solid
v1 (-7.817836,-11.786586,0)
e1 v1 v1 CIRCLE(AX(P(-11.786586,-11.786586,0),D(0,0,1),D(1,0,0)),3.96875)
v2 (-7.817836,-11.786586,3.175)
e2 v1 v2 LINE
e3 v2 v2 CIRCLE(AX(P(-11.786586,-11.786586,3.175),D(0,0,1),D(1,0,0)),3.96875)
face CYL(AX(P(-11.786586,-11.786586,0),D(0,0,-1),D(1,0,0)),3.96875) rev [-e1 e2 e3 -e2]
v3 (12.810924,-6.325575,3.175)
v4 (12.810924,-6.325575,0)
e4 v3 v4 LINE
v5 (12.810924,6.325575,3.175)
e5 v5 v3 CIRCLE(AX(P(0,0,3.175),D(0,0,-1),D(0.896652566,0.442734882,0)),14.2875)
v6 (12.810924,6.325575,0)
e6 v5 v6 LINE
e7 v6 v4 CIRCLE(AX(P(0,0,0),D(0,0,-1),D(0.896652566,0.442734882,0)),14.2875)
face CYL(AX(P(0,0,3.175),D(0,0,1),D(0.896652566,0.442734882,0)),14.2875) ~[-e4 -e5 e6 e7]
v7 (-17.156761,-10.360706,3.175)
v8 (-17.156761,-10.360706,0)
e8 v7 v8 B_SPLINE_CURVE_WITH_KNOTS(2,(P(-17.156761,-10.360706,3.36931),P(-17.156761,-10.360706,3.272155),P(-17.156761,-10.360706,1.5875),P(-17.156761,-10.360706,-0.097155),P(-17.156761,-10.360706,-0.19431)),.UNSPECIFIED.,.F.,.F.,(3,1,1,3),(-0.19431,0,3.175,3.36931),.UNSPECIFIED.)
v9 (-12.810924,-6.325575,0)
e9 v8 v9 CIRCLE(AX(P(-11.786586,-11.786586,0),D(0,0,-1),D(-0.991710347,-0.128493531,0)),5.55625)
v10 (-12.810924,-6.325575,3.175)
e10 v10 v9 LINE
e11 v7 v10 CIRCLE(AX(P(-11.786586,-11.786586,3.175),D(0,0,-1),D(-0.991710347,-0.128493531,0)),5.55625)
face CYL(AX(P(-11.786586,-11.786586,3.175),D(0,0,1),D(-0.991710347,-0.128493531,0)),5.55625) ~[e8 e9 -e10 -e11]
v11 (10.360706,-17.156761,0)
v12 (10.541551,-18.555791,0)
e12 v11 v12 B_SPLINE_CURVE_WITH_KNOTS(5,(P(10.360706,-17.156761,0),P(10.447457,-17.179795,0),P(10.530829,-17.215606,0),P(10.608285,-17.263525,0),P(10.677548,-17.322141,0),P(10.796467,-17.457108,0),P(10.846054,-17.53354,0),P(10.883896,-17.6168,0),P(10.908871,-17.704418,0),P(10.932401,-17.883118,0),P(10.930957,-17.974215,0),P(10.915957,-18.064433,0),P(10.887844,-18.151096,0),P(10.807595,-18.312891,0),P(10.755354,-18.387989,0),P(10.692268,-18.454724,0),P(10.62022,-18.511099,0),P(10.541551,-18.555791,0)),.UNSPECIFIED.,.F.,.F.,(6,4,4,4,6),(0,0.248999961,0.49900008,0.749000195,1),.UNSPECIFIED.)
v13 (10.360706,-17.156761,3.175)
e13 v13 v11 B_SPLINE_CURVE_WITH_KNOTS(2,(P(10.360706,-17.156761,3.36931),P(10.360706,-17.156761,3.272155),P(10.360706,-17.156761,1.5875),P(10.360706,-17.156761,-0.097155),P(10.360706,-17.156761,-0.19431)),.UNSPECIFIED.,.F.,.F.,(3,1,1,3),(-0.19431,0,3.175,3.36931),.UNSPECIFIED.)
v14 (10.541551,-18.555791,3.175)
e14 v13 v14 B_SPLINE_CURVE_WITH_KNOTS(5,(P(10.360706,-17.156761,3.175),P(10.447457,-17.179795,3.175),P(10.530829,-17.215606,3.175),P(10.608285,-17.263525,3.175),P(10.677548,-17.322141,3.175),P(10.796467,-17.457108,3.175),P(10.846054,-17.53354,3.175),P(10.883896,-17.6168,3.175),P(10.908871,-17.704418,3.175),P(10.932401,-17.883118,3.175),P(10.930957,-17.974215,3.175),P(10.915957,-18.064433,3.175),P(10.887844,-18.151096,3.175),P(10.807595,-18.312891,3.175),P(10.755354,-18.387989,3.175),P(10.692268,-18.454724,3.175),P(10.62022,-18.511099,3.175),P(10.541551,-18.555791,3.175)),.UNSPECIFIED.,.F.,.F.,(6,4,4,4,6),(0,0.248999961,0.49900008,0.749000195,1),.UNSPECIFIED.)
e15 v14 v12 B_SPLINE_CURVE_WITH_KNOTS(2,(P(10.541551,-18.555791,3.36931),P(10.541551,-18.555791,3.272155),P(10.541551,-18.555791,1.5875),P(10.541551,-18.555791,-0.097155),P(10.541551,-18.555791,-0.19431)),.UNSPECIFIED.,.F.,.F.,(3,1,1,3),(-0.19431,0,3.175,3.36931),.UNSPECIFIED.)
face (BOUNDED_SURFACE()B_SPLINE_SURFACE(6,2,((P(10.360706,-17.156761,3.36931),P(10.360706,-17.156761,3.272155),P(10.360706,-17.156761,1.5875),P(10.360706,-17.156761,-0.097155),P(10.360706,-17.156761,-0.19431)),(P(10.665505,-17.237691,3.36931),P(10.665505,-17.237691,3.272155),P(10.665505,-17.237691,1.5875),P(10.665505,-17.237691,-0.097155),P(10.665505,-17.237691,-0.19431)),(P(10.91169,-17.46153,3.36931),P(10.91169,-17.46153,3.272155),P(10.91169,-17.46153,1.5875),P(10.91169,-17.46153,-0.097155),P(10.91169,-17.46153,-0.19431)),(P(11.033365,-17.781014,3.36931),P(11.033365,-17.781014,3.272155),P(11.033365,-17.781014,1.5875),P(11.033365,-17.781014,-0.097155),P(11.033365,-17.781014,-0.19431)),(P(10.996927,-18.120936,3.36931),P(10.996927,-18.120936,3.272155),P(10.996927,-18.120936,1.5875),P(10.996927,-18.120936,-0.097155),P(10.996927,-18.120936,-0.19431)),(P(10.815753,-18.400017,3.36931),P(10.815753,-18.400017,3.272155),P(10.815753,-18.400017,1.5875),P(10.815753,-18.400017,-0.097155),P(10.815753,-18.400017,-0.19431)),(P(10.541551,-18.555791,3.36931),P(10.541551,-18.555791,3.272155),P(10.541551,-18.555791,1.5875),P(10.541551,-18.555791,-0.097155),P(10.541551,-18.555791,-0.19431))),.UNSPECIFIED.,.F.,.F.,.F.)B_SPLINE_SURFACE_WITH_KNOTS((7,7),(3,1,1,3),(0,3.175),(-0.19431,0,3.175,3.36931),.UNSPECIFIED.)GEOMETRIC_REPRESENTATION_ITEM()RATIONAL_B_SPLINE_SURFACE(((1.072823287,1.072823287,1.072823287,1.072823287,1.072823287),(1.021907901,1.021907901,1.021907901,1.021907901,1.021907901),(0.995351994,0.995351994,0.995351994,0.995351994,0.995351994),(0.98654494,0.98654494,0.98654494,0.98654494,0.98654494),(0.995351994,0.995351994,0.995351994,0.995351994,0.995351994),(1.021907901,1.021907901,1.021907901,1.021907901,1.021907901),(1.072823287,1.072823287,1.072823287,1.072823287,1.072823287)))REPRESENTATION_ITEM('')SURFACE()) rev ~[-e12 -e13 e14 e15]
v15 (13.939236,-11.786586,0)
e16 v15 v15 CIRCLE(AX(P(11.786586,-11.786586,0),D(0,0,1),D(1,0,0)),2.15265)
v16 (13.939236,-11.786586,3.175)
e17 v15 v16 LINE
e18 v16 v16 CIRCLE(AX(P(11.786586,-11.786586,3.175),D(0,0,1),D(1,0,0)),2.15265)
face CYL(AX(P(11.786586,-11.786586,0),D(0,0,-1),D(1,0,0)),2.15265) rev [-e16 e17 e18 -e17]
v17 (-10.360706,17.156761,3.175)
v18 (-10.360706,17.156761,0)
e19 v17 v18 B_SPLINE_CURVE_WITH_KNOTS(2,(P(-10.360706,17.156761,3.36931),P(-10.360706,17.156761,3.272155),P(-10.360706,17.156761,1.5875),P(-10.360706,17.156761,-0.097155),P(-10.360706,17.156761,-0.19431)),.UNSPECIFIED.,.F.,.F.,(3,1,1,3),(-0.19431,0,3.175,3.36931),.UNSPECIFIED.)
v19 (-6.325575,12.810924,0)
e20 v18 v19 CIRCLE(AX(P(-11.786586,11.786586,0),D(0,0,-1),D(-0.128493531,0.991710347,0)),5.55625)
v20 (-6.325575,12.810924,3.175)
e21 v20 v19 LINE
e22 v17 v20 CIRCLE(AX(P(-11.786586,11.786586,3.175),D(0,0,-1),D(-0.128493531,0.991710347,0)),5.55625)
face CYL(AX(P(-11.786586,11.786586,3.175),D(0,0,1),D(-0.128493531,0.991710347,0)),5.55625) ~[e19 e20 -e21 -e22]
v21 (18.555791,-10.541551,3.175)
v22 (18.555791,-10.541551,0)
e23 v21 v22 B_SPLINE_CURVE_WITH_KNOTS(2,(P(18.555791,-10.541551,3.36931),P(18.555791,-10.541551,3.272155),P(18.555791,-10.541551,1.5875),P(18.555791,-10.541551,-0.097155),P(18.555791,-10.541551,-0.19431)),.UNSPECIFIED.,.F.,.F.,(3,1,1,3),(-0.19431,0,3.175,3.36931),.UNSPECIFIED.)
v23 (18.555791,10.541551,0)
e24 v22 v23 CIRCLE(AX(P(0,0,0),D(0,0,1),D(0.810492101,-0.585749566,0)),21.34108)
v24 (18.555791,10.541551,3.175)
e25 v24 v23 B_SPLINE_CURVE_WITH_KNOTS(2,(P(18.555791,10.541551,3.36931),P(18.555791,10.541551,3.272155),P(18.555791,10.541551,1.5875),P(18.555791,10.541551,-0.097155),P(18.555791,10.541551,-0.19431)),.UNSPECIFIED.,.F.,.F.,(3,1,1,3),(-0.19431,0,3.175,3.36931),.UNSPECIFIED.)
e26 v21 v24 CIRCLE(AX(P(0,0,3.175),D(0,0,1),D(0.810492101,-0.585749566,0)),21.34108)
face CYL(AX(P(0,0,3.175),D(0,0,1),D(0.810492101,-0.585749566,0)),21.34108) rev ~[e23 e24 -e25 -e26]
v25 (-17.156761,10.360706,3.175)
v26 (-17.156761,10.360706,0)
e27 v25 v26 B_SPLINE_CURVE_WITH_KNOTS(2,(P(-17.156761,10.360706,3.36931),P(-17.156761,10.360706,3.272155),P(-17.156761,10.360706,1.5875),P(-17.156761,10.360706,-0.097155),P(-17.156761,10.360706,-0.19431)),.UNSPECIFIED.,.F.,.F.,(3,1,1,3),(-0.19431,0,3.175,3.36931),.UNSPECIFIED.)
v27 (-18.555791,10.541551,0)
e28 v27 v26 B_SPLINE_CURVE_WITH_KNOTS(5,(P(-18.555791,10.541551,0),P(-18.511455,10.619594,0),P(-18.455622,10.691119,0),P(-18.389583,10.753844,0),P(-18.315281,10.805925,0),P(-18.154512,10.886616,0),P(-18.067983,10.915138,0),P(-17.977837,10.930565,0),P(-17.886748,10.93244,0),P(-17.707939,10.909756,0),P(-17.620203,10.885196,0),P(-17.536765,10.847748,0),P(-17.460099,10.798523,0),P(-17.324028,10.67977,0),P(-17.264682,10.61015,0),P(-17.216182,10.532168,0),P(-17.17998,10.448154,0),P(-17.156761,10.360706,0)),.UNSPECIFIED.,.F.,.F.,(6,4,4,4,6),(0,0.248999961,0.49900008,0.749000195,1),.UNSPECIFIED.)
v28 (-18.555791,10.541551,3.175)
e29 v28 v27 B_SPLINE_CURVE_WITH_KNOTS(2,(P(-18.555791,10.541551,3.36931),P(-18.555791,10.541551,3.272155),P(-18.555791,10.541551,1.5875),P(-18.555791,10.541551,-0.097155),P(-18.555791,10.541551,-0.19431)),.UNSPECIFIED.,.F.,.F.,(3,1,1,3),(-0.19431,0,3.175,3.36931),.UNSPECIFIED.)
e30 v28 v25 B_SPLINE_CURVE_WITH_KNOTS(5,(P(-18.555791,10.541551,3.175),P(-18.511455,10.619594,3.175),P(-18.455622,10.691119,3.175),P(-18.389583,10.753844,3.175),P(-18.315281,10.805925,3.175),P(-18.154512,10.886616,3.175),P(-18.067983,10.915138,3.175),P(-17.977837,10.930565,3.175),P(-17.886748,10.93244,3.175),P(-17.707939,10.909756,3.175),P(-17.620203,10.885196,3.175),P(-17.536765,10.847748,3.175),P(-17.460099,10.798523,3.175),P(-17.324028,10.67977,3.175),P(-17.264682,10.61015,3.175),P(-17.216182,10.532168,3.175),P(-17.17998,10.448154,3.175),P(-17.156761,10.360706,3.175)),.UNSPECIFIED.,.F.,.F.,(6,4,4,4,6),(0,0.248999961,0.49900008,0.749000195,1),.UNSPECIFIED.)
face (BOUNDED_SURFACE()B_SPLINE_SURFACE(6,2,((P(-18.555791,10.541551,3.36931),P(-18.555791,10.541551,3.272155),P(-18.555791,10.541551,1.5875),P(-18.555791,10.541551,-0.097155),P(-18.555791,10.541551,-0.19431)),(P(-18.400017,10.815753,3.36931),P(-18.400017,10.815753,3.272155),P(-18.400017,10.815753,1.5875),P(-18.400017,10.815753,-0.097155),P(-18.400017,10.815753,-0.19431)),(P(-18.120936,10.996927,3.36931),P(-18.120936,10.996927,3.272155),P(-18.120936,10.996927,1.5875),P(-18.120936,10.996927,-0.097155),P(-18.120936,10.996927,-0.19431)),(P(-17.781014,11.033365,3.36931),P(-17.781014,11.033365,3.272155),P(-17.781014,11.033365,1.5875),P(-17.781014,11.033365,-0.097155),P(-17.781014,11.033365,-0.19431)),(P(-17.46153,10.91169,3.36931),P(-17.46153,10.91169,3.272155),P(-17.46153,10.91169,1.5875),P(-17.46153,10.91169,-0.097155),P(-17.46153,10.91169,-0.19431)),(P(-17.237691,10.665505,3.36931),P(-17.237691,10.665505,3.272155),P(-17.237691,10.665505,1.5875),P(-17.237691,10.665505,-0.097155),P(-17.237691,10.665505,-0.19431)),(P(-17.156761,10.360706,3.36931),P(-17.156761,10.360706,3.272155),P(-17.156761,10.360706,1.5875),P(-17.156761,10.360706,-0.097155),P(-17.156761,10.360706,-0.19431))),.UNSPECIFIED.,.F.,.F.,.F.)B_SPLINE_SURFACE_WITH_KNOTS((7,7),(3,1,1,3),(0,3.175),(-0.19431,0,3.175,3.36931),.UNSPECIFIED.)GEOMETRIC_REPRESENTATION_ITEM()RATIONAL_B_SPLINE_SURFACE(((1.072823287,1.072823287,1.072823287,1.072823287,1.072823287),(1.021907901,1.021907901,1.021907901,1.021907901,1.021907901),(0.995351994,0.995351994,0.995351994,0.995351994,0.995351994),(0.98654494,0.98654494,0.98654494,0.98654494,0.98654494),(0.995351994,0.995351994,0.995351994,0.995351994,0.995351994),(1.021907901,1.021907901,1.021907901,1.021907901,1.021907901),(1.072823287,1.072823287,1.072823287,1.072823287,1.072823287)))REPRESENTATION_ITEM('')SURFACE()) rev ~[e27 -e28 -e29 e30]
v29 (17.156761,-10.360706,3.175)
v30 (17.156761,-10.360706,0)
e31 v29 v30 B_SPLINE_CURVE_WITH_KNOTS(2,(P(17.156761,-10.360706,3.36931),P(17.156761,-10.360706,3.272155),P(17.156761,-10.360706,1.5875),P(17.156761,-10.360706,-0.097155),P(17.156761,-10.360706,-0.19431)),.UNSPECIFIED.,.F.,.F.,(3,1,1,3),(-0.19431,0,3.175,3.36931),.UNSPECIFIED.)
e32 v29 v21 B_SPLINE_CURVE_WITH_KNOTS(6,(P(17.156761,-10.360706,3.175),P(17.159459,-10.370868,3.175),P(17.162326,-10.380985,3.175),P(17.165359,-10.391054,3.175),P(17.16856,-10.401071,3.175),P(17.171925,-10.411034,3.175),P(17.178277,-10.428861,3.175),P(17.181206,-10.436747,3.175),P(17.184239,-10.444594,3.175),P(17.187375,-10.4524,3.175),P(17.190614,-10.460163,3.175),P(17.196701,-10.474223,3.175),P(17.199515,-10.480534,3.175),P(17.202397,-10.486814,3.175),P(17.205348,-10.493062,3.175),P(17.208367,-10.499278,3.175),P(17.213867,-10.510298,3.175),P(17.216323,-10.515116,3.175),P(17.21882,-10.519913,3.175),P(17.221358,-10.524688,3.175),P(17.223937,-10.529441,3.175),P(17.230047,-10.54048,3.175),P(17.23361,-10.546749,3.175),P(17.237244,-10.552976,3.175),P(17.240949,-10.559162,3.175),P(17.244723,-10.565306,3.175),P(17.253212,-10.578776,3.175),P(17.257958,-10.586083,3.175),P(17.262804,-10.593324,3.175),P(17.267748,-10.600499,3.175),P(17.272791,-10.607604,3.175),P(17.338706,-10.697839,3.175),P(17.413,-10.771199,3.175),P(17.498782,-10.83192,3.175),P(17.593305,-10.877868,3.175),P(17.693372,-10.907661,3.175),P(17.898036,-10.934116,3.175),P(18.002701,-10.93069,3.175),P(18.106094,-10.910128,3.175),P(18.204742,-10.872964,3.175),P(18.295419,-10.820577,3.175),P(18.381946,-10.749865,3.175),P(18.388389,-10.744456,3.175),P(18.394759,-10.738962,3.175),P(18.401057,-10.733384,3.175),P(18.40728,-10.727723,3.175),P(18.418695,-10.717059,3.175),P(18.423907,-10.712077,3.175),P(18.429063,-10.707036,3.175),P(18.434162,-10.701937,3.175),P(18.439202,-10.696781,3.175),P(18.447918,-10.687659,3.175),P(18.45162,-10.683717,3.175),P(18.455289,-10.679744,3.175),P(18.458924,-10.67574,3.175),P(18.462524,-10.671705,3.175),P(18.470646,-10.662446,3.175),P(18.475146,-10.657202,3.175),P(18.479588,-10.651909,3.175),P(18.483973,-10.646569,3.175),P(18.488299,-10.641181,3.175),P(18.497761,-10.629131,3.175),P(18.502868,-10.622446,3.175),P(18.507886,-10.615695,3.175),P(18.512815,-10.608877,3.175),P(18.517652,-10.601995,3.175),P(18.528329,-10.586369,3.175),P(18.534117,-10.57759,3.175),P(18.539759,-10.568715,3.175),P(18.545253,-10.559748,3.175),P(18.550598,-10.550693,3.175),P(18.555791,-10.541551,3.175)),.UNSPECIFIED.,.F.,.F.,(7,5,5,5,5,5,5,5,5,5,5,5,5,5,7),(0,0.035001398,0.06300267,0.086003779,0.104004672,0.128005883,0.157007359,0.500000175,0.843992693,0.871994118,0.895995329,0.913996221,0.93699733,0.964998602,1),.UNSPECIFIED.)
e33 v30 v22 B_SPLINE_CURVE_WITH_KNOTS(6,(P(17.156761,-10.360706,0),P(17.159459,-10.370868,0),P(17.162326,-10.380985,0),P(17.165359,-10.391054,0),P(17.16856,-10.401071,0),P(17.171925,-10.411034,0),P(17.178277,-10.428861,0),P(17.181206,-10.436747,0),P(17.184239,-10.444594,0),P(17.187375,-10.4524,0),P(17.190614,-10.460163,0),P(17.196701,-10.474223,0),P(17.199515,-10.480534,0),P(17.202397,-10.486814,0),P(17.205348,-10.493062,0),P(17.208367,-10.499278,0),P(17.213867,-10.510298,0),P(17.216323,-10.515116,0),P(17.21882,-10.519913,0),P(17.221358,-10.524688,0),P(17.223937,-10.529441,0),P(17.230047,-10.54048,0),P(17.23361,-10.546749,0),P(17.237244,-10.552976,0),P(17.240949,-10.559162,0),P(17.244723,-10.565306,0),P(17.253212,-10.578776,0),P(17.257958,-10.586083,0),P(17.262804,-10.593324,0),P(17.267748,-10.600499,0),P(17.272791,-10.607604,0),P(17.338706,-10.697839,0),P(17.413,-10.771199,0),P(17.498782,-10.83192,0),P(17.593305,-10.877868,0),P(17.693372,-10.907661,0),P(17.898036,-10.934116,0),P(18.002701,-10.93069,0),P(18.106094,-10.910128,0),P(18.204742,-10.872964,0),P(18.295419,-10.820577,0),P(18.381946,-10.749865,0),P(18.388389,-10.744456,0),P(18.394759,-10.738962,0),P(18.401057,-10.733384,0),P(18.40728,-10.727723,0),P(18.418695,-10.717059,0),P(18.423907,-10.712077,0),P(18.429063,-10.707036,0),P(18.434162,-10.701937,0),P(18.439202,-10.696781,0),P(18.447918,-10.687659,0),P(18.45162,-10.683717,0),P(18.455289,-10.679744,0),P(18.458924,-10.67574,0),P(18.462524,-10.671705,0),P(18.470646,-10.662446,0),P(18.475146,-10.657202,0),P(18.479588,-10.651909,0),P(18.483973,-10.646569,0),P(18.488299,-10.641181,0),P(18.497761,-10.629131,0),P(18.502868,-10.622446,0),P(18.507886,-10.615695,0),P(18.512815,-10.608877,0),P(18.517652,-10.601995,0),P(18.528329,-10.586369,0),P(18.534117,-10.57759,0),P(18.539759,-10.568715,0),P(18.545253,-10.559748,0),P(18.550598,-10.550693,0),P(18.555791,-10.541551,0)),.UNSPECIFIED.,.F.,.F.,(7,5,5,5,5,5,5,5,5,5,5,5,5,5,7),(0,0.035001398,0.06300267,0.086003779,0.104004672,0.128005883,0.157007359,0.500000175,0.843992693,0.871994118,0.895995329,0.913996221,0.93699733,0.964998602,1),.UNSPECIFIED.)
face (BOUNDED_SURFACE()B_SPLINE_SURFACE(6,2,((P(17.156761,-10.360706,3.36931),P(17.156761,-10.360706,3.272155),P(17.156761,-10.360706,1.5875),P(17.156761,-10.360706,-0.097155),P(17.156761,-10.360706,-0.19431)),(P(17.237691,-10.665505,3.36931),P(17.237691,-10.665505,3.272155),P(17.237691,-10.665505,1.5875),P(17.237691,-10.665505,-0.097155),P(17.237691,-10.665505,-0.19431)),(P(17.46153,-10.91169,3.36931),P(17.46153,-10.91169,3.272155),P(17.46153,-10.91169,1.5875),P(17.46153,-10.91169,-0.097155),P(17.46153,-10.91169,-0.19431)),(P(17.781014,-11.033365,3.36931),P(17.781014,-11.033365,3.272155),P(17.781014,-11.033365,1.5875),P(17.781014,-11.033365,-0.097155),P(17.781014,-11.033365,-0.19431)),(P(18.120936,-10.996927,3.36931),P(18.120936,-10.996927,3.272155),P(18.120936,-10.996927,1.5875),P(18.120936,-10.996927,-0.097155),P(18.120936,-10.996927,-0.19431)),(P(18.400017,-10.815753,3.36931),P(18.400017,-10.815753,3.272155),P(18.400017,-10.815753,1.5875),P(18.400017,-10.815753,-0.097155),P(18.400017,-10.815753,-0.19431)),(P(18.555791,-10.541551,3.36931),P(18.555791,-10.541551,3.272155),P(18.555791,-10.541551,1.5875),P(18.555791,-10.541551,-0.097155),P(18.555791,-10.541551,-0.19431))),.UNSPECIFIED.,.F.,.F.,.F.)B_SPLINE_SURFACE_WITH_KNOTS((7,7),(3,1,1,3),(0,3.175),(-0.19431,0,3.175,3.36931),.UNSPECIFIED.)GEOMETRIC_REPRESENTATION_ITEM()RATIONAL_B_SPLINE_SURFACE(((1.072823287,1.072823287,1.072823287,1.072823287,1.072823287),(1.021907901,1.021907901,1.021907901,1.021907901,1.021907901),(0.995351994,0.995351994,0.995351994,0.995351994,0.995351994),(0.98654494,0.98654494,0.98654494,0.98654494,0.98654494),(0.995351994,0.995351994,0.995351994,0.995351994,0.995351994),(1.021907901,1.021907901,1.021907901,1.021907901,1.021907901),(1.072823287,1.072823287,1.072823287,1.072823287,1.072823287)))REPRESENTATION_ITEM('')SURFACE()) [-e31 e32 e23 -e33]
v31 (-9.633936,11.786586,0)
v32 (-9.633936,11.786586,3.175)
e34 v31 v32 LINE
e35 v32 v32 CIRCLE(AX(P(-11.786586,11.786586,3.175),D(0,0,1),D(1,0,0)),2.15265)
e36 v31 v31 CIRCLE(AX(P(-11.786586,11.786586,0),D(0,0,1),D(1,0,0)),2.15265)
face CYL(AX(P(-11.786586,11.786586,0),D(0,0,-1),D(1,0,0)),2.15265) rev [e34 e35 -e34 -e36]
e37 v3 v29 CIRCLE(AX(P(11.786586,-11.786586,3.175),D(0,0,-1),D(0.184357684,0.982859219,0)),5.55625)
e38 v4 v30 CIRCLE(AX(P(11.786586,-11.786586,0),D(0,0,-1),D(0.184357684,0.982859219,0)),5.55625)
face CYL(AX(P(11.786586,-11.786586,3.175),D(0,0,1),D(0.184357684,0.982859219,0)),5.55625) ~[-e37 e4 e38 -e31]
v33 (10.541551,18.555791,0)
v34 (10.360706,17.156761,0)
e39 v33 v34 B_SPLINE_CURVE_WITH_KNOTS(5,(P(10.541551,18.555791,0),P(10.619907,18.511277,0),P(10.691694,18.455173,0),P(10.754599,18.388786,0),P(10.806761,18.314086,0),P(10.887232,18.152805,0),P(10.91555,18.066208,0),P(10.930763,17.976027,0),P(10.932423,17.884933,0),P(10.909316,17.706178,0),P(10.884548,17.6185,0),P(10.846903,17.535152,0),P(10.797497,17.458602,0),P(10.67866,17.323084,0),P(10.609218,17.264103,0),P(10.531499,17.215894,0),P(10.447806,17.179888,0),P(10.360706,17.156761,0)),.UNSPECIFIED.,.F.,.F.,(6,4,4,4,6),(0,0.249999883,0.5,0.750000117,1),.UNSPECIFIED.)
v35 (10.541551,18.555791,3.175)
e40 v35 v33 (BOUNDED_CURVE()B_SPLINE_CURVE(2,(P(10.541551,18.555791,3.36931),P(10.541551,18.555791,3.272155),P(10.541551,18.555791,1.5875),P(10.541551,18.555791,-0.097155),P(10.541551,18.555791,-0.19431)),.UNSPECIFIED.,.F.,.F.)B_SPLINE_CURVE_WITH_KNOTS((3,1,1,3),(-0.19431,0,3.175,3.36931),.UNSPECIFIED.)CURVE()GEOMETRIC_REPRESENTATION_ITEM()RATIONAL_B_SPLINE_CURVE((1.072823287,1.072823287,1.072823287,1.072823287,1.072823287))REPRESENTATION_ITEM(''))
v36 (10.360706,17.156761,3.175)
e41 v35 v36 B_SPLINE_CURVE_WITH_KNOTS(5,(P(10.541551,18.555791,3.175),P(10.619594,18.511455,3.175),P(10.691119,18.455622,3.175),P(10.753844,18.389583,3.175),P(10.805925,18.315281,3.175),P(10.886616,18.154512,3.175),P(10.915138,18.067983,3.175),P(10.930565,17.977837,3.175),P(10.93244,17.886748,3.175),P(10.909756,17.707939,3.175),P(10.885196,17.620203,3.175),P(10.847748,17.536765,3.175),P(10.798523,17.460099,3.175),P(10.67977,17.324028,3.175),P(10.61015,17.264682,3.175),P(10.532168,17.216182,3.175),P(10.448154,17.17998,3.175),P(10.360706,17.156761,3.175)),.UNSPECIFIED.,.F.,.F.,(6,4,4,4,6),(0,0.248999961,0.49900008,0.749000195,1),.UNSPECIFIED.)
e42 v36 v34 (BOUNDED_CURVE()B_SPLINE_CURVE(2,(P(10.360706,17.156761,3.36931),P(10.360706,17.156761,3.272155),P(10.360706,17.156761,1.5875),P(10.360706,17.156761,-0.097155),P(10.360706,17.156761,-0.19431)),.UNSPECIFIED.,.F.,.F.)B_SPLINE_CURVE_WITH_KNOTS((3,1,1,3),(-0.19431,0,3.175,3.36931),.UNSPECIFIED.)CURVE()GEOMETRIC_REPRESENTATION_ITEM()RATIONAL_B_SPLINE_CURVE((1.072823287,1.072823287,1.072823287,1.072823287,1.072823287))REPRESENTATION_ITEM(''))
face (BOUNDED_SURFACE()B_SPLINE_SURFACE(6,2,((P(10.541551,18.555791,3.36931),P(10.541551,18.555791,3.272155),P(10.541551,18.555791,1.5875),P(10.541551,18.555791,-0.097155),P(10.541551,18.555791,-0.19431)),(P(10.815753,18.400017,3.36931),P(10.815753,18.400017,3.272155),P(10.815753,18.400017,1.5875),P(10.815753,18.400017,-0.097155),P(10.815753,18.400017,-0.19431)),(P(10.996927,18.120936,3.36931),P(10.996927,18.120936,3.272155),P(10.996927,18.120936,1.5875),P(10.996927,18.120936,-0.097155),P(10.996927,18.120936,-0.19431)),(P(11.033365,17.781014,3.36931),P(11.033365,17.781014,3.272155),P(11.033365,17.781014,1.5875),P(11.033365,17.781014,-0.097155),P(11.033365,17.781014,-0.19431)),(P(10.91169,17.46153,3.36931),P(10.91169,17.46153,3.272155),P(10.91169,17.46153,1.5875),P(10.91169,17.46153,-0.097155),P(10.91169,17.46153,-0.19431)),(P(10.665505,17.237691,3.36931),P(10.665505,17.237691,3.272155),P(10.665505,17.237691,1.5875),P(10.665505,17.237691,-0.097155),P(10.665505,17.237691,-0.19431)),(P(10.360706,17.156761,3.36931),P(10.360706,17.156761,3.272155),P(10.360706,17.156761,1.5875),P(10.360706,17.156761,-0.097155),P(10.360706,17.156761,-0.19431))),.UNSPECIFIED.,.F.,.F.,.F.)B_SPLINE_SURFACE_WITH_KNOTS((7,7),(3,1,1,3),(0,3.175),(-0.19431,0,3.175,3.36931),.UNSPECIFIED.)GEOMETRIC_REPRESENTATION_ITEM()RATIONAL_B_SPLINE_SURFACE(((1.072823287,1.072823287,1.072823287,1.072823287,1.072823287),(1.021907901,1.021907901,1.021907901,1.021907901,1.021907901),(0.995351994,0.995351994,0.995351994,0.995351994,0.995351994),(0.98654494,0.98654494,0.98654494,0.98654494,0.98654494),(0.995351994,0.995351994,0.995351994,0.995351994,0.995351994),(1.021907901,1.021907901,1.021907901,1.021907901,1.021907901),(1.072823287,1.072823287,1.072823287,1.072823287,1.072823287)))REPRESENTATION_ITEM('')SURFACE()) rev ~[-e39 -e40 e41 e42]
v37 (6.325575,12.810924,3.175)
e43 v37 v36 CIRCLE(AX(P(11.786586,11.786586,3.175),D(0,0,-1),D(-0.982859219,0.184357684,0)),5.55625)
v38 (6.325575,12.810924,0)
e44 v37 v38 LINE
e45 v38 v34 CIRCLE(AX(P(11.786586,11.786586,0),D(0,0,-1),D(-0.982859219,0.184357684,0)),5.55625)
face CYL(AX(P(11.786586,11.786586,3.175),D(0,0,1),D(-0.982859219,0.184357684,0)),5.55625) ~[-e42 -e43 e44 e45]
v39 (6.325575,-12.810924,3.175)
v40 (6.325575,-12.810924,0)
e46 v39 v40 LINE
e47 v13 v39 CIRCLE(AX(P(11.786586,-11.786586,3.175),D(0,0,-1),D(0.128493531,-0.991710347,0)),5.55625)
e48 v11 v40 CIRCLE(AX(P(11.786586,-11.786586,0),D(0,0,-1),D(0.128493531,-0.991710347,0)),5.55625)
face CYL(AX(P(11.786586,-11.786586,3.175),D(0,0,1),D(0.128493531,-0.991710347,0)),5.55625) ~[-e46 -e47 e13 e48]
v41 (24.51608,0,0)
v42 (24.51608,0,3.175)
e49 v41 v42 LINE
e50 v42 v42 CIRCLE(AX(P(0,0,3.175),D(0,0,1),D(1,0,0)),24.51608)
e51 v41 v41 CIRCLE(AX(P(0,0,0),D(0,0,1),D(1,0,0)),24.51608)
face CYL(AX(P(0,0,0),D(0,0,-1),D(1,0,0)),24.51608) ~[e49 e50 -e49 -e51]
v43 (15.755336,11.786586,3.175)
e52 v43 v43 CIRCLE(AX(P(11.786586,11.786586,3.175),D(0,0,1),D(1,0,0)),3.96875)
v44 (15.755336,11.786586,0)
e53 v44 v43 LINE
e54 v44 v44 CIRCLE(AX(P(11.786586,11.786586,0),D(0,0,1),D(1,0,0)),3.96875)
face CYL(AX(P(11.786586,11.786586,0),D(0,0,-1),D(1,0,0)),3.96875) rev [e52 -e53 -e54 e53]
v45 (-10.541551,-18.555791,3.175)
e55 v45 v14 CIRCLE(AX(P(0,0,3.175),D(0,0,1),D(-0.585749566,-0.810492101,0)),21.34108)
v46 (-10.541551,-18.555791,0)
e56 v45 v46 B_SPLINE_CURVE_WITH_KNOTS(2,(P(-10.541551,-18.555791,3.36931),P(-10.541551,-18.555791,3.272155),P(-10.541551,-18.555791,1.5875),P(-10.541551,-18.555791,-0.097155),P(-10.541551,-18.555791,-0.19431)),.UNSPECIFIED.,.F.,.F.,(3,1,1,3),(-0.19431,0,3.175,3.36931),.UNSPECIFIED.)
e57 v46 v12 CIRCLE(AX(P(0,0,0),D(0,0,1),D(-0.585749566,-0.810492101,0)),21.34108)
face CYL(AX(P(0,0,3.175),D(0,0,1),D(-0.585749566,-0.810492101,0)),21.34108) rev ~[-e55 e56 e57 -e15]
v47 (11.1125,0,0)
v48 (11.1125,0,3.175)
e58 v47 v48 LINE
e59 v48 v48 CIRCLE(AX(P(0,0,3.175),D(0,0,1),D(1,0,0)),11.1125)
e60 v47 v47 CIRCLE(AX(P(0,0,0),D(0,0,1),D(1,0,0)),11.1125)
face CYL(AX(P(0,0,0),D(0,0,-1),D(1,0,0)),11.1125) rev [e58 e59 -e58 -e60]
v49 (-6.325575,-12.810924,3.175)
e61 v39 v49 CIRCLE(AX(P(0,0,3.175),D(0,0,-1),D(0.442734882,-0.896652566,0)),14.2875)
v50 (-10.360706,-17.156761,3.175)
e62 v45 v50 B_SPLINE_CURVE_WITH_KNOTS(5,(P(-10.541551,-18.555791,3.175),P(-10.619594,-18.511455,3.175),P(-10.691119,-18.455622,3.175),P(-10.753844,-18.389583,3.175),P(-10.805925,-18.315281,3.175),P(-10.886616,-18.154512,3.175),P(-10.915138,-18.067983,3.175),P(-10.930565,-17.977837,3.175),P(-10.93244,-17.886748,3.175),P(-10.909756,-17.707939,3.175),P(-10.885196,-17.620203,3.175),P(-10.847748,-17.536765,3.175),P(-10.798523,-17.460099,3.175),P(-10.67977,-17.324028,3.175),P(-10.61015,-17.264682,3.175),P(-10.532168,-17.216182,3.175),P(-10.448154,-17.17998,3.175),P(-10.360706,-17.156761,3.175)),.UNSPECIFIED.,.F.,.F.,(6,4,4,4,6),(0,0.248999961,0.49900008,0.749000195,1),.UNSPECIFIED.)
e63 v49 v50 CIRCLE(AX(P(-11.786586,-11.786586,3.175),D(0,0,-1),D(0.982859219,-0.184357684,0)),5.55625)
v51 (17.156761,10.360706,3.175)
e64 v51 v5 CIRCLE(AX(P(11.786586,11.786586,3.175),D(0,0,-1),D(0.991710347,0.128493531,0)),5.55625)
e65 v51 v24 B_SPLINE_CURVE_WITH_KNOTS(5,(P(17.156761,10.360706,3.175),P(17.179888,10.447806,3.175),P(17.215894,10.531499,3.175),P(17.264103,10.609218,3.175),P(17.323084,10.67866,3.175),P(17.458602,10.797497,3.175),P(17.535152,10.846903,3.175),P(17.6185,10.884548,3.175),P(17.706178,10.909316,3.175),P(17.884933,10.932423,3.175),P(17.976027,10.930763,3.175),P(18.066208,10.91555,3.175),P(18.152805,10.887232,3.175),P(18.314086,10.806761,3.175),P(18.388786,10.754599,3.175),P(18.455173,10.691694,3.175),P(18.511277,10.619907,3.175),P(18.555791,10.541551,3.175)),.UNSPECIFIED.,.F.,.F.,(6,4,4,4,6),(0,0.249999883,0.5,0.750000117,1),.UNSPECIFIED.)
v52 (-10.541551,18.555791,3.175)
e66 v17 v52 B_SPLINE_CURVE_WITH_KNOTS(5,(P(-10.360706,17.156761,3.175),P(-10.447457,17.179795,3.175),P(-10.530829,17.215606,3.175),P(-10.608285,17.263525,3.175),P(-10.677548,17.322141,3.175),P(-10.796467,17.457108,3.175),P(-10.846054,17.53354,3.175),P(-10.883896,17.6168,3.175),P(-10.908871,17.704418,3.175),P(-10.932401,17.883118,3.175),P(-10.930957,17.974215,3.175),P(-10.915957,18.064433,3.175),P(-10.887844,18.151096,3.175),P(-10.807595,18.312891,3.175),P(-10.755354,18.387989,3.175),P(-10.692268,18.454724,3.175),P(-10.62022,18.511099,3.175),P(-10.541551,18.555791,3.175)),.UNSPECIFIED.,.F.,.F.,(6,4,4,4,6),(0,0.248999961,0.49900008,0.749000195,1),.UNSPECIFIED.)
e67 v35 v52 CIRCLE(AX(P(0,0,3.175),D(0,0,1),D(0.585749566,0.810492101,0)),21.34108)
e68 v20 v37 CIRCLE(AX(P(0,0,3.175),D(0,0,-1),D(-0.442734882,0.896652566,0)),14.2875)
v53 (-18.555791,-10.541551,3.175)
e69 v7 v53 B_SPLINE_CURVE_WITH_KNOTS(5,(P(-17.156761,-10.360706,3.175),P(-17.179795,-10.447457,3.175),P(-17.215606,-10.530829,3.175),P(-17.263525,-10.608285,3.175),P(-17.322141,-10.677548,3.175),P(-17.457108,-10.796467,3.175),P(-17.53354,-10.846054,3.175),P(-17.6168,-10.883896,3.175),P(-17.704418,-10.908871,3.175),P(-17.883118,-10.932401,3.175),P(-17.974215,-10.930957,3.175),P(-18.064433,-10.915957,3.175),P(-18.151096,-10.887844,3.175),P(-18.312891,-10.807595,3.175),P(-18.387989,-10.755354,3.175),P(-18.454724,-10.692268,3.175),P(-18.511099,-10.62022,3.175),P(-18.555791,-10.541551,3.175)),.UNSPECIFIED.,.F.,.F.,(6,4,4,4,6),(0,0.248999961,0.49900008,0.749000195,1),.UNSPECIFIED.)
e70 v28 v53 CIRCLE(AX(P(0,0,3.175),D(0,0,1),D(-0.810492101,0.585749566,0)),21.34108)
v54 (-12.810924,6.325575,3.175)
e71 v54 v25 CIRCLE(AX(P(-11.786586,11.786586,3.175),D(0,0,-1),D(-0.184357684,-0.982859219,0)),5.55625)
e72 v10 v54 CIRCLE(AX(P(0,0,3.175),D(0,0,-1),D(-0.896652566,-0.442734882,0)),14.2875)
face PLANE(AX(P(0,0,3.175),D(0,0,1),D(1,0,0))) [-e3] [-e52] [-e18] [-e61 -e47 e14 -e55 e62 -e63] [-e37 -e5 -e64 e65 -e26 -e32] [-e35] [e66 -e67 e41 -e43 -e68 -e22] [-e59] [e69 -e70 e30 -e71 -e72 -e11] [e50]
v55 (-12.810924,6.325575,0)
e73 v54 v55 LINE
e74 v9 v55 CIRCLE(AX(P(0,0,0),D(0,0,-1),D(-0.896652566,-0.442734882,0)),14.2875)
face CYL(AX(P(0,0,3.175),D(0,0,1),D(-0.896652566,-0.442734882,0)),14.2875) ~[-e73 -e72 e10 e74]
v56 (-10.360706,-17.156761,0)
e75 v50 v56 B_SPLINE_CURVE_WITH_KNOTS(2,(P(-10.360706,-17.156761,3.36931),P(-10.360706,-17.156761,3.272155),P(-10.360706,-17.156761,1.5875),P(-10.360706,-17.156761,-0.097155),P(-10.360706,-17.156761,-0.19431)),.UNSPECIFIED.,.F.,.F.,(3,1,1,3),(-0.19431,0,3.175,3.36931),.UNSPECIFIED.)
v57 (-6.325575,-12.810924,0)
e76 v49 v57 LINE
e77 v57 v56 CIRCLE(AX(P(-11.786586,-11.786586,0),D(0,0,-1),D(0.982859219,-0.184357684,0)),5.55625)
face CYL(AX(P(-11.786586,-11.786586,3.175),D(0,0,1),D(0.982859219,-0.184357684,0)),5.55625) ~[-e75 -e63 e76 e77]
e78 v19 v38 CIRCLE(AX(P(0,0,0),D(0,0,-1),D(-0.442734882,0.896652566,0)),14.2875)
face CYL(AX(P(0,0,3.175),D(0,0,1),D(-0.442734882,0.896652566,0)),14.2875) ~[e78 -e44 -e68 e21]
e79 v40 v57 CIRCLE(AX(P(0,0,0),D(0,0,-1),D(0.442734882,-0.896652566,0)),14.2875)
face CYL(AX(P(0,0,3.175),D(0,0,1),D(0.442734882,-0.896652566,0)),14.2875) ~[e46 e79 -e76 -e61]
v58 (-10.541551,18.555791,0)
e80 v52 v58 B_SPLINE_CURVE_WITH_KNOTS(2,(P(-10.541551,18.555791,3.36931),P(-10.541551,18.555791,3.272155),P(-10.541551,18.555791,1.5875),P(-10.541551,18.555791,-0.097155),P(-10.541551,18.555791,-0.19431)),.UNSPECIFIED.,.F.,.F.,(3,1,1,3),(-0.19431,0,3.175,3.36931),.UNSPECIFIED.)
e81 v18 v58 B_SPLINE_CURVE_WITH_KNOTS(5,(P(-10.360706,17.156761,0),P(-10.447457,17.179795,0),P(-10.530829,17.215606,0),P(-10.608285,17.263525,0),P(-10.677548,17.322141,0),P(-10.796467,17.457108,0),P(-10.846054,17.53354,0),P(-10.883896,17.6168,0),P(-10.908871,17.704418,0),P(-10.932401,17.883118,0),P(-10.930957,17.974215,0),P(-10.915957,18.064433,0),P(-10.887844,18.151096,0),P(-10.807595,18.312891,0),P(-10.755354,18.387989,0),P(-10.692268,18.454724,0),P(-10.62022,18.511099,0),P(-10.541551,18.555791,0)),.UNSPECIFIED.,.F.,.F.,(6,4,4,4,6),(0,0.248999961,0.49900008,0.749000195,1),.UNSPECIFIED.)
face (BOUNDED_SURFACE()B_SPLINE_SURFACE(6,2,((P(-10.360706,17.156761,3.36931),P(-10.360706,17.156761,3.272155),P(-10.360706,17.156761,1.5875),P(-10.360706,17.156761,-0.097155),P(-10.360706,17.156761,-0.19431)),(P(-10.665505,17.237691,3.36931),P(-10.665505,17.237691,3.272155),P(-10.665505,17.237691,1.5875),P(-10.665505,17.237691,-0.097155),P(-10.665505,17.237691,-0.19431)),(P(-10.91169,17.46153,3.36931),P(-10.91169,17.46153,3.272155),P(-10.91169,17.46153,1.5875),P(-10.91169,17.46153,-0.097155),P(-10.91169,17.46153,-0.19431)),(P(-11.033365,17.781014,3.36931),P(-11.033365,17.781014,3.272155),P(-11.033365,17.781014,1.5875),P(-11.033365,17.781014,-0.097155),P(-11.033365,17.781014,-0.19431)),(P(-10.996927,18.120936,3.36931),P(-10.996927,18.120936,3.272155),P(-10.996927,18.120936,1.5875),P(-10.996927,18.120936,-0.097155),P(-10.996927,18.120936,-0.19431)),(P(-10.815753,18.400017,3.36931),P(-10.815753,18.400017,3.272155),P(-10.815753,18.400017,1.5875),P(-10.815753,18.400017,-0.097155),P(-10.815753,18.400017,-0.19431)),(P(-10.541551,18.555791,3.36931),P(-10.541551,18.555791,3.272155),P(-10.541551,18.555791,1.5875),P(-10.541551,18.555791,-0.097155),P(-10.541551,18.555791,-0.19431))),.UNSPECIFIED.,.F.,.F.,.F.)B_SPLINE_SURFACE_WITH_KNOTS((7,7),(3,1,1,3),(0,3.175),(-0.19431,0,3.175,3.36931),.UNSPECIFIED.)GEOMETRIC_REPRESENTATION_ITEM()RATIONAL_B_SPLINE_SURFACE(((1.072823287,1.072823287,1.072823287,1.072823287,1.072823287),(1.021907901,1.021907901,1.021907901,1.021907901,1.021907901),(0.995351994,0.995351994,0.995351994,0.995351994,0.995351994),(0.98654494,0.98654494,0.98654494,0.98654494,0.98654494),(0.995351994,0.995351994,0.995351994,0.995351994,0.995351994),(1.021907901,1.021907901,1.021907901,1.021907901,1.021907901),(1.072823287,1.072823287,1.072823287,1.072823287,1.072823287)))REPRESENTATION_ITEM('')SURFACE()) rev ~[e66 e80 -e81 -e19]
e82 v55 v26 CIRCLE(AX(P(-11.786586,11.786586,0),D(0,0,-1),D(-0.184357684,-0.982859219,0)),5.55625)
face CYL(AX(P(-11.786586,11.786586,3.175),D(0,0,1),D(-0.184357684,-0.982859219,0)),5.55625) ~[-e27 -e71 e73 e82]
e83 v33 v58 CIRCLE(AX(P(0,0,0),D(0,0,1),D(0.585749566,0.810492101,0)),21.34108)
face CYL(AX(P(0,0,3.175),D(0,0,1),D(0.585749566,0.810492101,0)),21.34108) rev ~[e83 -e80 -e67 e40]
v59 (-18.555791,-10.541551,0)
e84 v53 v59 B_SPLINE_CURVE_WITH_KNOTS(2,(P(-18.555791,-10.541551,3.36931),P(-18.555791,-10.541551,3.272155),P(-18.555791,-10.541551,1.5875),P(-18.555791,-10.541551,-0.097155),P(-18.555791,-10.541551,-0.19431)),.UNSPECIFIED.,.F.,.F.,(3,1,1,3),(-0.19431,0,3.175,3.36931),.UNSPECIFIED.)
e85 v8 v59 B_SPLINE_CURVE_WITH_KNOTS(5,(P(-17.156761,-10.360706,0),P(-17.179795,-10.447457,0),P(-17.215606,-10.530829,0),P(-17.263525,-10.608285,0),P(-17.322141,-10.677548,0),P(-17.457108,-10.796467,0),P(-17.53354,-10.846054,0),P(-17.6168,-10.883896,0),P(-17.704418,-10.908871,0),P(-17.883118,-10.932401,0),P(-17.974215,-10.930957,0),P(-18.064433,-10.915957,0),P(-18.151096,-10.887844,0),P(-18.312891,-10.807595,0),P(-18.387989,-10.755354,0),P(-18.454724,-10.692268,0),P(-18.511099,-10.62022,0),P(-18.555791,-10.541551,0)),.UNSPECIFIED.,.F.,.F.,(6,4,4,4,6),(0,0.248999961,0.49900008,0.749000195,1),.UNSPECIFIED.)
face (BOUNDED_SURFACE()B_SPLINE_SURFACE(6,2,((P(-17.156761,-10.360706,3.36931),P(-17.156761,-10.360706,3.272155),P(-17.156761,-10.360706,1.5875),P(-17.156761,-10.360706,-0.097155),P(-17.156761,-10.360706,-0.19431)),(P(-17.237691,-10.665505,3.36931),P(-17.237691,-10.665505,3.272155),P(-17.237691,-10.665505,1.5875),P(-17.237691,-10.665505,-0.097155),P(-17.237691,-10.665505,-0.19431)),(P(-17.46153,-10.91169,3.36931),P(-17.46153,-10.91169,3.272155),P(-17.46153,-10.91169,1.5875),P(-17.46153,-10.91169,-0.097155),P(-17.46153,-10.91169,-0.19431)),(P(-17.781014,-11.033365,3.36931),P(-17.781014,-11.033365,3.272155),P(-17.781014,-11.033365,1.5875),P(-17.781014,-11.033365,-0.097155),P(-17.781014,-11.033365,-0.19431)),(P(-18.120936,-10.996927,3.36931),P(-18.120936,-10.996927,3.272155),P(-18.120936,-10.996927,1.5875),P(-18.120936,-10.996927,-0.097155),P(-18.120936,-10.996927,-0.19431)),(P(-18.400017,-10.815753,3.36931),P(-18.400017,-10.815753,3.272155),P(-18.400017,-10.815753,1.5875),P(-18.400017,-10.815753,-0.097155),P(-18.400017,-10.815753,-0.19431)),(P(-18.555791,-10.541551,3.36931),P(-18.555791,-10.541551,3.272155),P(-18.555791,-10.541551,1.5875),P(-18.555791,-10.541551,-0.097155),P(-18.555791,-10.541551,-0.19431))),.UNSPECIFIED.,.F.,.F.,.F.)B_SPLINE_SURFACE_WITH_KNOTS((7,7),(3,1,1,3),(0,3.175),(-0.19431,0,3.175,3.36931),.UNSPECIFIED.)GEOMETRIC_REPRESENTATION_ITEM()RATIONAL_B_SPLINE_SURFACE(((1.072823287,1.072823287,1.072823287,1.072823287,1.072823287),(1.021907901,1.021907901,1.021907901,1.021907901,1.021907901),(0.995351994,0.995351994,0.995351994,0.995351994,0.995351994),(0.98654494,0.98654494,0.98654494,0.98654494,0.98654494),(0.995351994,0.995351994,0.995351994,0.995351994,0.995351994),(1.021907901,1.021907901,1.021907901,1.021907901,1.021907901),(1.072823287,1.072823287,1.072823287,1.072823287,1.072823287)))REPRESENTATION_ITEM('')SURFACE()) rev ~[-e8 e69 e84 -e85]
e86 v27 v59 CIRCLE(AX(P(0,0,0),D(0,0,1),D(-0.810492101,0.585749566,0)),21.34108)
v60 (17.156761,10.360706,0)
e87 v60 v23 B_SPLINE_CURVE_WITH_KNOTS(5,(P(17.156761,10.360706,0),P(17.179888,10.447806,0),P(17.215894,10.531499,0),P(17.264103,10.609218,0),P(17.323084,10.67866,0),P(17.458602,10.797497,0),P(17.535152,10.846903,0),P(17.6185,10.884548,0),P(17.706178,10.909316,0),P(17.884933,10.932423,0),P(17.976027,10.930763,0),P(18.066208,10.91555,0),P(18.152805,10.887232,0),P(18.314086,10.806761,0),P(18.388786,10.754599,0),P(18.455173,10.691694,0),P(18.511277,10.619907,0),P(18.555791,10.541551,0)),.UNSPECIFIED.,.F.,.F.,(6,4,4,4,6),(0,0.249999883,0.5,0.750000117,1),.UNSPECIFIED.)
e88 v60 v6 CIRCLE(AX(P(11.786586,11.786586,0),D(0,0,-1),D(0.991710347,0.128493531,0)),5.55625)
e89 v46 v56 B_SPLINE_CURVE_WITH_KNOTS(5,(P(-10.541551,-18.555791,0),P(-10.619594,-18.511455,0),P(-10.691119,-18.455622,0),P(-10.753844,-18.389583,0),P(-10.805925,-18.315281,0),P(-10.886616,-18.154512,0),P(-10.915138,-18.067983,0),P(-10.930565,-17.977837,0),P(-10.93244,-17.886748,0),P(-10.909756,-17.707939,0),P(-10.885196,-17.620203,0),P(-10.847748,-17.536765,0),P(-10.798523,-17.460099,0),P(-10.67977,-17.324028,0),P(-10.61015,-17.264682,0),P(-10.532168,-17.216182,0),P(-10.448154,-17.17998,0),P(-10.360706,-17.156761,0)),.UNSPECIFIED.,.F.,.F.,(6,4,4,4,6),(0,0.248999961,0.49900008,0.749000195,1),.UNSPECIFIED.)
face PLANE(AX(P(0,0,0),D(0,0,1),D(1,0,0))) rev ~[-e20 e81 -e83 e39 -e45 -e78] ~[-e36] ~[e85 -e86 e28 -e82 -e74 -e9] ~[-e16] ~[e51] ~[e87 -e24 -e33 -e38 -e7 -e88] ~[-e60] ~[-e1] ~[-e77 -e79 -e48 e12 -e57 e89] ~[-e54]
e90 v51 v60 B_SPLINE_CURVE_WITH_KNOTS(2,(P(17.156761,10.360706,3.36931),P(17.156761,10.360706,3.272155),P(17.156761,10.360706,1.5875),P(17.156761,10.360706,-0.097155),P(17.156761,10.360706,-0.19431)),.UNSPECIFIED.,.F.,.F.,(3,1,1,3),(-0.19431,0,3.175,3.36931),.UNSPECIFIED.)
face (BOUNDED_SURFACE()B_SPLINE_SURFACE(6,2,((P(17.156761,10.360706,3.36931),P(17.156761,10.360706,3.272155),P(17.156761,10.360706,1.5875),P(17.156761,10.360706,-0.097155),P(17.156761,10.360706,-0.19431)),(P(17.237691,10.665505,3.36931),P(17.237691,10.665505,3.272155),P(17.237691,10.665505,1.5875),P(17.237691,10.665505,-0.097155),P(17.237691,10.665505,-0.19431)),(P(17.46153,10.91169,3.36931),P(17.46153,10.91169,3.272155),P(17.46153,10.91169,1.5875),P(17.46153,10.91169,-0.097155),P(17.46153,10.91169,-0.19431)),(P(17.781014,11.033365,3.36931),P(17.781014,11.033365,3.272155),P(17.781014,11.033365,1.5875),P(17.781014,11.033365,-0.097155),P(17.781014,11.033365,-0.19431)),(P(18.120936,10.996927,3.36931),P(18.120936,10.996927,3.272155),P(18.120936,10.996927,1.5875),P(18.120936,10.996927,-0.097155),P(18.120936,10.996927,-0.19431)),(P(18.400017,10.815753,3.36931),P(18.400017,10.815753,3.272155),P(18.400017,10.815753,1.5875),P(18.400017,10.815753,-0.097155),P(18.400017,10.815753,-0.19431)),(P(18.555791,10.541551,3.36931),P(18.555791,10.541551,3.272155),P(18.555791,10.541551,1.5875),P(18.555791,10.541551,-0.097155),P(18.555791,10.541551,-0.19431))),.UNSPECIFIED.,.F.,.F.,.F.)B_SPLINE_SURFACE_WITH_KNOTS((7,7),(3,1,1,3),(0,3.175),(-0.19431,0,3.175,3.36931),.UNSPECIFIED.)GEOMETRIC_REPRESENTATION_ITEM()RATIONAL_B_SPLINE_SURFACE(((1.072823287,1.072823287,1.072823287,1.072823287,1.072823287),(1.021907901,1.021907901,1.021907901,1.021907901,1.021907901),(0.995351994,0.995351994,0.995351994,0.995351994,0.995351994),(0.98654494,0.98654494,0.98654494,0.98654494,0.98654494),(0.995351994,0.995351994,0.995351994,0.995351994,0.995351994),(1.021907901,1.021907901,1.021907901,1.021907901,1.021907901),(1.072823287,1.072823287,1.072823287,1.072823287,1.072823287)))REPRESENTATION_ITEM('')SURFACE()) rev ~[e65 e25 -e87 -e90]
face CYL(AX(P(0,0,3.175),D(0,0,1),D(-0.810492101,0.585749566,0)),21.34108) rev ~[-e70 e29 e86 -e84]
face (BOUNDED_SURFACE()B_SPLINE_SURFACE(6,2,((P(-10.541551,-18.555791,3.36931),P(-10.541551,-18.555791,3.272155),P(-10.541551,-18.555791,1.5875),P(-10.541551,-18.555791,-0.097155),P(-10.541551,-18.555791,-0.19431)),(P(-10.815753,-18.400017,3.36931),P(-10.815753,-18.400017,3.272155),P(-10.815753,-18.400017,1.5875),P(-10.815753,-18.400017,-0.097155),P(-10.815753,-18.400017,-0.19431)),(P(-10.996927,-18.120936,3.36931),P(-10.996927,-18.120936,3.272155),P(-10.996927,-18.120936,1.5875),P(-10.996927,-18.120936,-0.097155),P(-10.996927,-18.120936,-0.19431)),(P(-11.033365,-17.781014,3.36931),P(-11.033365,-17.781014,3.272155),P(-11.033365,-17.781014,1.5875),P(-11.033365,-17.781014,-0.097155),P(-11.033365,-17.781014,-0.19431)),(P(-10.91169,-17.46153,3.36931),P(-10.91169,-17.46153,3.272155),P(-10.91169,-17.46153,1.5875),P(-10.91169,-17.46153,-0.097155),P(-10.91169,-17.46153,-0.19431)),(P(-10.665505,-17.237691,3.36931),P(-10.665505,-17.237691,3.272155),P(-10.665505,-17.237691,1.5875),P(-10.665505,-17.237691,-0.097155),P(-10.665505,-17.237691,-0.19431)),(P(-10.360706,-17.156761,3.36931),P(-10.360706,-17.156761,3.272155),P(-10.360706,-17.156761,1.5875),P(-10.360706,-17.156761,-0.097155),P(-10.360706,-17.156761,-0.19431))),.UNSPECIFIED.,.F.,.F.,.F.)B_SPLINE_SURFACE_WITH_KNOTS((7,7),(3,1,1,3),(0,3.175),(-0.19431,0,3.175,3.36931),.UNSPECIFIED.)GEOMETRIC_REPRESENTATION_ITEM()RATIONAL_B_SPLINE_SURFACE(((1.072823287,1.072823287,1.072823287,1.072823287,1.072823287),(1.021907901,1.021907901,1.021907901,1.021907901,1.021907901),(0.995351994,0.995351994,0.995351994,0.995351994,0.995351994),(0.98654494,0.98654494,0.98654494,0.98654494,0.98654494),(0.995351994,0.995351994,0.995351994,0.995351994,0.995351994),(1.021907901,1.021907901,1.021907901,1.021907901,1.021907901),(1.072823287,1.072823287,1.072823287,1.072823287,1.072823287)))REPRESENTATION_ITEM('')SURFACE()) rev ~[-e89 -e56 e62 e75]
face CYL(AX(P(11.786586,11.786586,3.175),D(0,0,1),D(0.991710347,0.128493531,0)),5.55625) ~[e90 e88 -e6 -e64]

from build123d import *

# Parameters (mm, degrees)
F0_R            = 24.51608
F0_R_2          = 3.96875
F0_R_3          = 2.15265
F0_R_4          = 11.1125
F1_DEPTH        = 3.175
F3_DEPTH        = 3.175
F3_COPIES_COUNT = 4
F4_R            = 0.762


# Not quite as in the source:
# - a pattern or mirror of a feature is missing from the dataset's text; its kind, count and spacing are read off the source's solid


with BuildPart() as f1:
    # F0 (on Top) → F1 (new body)
    with BuildSketch(Plane.XY):
        Circle(F0_R)
        with Locations((-11.7865861589, -11.7865861589)):
            Circle(F0_R_2, mode=Mode.SUBTRACT)
        with Locations((11.7865861589, -11.7865861589)):
            Circle(F0_R_3, mode=Mode.SUBTRACT)
        with Locations((-11.7865861589, 11.7865861589)):
            Circle(F0_R_3, mode=Mode.SUBTRACT)
        Circle(F0_R_4, mode=Mode.SUBTRACT)
        with Locations((11.7865861589, 11.7865861589)):
            Circle(F0_R_2, mode=Mode.SUBTRACT)
    extrude(amount=F1_DEPTH)

    # F2 (on face) → F3 (cut, through all)
    with BuildSketch(Plane.XY.offset(3.175)):
        with BuildLine():
            ThreePointArc((-12.5005283394, 17.296776775), (-8.5209489043, 16.2818645023), (-6.3255746232, 12.8109235396))
            ThreePointArc((-6.3255746232, 12.8109235396), (0, 14.2875), (6.3255746232, 12.8109235396))
            ThreePointArc((6.3255746232, 12.8109235396), (8.5209489043, 16.2818645023), (12.5005283394, 17.296776775))
            ThreePointArc((12.5005283394, 17.296776775), (0, 21.34108), (-12.5005283394, 17.296776775))
        make_face()
    f3 = extrude(amount=-F3_DEPTH, mode=Mode.SUBTRACT)

    # F3_copies: F3 ×4 about axis
    f3_copies_axis = Axis((0, 0, 0), (0, 0, 1))
    for i in range(1, F3_COPIES_COUNT):
        add(f3.rotate(f3_copies_axis, i * 360 / F3_COPIES_COUNT), mode=Mode.SUBTRACT)

    # F4
    f4_edges = [f1.edges().sort_by_distance(p)[0] for p in [
        (-12.500528, 17.296777, 1.5875),
        (12.500528, 17.296777, 1.5875),
        (12.500528, -17.296777, 1.5875),
        (-12.500528, -17.296777, 1.5875),
        (17.296777, 12.500528, 1.5875),
        (17.296777, -12.500528, 1.5875),
        (-17.296777, -12.500528, 1.5875),
        (-17.296777, 12.500528, 1.5875),
    ]]
    fillet(f4_edges, radius=F4_R)


solid = f1.part
